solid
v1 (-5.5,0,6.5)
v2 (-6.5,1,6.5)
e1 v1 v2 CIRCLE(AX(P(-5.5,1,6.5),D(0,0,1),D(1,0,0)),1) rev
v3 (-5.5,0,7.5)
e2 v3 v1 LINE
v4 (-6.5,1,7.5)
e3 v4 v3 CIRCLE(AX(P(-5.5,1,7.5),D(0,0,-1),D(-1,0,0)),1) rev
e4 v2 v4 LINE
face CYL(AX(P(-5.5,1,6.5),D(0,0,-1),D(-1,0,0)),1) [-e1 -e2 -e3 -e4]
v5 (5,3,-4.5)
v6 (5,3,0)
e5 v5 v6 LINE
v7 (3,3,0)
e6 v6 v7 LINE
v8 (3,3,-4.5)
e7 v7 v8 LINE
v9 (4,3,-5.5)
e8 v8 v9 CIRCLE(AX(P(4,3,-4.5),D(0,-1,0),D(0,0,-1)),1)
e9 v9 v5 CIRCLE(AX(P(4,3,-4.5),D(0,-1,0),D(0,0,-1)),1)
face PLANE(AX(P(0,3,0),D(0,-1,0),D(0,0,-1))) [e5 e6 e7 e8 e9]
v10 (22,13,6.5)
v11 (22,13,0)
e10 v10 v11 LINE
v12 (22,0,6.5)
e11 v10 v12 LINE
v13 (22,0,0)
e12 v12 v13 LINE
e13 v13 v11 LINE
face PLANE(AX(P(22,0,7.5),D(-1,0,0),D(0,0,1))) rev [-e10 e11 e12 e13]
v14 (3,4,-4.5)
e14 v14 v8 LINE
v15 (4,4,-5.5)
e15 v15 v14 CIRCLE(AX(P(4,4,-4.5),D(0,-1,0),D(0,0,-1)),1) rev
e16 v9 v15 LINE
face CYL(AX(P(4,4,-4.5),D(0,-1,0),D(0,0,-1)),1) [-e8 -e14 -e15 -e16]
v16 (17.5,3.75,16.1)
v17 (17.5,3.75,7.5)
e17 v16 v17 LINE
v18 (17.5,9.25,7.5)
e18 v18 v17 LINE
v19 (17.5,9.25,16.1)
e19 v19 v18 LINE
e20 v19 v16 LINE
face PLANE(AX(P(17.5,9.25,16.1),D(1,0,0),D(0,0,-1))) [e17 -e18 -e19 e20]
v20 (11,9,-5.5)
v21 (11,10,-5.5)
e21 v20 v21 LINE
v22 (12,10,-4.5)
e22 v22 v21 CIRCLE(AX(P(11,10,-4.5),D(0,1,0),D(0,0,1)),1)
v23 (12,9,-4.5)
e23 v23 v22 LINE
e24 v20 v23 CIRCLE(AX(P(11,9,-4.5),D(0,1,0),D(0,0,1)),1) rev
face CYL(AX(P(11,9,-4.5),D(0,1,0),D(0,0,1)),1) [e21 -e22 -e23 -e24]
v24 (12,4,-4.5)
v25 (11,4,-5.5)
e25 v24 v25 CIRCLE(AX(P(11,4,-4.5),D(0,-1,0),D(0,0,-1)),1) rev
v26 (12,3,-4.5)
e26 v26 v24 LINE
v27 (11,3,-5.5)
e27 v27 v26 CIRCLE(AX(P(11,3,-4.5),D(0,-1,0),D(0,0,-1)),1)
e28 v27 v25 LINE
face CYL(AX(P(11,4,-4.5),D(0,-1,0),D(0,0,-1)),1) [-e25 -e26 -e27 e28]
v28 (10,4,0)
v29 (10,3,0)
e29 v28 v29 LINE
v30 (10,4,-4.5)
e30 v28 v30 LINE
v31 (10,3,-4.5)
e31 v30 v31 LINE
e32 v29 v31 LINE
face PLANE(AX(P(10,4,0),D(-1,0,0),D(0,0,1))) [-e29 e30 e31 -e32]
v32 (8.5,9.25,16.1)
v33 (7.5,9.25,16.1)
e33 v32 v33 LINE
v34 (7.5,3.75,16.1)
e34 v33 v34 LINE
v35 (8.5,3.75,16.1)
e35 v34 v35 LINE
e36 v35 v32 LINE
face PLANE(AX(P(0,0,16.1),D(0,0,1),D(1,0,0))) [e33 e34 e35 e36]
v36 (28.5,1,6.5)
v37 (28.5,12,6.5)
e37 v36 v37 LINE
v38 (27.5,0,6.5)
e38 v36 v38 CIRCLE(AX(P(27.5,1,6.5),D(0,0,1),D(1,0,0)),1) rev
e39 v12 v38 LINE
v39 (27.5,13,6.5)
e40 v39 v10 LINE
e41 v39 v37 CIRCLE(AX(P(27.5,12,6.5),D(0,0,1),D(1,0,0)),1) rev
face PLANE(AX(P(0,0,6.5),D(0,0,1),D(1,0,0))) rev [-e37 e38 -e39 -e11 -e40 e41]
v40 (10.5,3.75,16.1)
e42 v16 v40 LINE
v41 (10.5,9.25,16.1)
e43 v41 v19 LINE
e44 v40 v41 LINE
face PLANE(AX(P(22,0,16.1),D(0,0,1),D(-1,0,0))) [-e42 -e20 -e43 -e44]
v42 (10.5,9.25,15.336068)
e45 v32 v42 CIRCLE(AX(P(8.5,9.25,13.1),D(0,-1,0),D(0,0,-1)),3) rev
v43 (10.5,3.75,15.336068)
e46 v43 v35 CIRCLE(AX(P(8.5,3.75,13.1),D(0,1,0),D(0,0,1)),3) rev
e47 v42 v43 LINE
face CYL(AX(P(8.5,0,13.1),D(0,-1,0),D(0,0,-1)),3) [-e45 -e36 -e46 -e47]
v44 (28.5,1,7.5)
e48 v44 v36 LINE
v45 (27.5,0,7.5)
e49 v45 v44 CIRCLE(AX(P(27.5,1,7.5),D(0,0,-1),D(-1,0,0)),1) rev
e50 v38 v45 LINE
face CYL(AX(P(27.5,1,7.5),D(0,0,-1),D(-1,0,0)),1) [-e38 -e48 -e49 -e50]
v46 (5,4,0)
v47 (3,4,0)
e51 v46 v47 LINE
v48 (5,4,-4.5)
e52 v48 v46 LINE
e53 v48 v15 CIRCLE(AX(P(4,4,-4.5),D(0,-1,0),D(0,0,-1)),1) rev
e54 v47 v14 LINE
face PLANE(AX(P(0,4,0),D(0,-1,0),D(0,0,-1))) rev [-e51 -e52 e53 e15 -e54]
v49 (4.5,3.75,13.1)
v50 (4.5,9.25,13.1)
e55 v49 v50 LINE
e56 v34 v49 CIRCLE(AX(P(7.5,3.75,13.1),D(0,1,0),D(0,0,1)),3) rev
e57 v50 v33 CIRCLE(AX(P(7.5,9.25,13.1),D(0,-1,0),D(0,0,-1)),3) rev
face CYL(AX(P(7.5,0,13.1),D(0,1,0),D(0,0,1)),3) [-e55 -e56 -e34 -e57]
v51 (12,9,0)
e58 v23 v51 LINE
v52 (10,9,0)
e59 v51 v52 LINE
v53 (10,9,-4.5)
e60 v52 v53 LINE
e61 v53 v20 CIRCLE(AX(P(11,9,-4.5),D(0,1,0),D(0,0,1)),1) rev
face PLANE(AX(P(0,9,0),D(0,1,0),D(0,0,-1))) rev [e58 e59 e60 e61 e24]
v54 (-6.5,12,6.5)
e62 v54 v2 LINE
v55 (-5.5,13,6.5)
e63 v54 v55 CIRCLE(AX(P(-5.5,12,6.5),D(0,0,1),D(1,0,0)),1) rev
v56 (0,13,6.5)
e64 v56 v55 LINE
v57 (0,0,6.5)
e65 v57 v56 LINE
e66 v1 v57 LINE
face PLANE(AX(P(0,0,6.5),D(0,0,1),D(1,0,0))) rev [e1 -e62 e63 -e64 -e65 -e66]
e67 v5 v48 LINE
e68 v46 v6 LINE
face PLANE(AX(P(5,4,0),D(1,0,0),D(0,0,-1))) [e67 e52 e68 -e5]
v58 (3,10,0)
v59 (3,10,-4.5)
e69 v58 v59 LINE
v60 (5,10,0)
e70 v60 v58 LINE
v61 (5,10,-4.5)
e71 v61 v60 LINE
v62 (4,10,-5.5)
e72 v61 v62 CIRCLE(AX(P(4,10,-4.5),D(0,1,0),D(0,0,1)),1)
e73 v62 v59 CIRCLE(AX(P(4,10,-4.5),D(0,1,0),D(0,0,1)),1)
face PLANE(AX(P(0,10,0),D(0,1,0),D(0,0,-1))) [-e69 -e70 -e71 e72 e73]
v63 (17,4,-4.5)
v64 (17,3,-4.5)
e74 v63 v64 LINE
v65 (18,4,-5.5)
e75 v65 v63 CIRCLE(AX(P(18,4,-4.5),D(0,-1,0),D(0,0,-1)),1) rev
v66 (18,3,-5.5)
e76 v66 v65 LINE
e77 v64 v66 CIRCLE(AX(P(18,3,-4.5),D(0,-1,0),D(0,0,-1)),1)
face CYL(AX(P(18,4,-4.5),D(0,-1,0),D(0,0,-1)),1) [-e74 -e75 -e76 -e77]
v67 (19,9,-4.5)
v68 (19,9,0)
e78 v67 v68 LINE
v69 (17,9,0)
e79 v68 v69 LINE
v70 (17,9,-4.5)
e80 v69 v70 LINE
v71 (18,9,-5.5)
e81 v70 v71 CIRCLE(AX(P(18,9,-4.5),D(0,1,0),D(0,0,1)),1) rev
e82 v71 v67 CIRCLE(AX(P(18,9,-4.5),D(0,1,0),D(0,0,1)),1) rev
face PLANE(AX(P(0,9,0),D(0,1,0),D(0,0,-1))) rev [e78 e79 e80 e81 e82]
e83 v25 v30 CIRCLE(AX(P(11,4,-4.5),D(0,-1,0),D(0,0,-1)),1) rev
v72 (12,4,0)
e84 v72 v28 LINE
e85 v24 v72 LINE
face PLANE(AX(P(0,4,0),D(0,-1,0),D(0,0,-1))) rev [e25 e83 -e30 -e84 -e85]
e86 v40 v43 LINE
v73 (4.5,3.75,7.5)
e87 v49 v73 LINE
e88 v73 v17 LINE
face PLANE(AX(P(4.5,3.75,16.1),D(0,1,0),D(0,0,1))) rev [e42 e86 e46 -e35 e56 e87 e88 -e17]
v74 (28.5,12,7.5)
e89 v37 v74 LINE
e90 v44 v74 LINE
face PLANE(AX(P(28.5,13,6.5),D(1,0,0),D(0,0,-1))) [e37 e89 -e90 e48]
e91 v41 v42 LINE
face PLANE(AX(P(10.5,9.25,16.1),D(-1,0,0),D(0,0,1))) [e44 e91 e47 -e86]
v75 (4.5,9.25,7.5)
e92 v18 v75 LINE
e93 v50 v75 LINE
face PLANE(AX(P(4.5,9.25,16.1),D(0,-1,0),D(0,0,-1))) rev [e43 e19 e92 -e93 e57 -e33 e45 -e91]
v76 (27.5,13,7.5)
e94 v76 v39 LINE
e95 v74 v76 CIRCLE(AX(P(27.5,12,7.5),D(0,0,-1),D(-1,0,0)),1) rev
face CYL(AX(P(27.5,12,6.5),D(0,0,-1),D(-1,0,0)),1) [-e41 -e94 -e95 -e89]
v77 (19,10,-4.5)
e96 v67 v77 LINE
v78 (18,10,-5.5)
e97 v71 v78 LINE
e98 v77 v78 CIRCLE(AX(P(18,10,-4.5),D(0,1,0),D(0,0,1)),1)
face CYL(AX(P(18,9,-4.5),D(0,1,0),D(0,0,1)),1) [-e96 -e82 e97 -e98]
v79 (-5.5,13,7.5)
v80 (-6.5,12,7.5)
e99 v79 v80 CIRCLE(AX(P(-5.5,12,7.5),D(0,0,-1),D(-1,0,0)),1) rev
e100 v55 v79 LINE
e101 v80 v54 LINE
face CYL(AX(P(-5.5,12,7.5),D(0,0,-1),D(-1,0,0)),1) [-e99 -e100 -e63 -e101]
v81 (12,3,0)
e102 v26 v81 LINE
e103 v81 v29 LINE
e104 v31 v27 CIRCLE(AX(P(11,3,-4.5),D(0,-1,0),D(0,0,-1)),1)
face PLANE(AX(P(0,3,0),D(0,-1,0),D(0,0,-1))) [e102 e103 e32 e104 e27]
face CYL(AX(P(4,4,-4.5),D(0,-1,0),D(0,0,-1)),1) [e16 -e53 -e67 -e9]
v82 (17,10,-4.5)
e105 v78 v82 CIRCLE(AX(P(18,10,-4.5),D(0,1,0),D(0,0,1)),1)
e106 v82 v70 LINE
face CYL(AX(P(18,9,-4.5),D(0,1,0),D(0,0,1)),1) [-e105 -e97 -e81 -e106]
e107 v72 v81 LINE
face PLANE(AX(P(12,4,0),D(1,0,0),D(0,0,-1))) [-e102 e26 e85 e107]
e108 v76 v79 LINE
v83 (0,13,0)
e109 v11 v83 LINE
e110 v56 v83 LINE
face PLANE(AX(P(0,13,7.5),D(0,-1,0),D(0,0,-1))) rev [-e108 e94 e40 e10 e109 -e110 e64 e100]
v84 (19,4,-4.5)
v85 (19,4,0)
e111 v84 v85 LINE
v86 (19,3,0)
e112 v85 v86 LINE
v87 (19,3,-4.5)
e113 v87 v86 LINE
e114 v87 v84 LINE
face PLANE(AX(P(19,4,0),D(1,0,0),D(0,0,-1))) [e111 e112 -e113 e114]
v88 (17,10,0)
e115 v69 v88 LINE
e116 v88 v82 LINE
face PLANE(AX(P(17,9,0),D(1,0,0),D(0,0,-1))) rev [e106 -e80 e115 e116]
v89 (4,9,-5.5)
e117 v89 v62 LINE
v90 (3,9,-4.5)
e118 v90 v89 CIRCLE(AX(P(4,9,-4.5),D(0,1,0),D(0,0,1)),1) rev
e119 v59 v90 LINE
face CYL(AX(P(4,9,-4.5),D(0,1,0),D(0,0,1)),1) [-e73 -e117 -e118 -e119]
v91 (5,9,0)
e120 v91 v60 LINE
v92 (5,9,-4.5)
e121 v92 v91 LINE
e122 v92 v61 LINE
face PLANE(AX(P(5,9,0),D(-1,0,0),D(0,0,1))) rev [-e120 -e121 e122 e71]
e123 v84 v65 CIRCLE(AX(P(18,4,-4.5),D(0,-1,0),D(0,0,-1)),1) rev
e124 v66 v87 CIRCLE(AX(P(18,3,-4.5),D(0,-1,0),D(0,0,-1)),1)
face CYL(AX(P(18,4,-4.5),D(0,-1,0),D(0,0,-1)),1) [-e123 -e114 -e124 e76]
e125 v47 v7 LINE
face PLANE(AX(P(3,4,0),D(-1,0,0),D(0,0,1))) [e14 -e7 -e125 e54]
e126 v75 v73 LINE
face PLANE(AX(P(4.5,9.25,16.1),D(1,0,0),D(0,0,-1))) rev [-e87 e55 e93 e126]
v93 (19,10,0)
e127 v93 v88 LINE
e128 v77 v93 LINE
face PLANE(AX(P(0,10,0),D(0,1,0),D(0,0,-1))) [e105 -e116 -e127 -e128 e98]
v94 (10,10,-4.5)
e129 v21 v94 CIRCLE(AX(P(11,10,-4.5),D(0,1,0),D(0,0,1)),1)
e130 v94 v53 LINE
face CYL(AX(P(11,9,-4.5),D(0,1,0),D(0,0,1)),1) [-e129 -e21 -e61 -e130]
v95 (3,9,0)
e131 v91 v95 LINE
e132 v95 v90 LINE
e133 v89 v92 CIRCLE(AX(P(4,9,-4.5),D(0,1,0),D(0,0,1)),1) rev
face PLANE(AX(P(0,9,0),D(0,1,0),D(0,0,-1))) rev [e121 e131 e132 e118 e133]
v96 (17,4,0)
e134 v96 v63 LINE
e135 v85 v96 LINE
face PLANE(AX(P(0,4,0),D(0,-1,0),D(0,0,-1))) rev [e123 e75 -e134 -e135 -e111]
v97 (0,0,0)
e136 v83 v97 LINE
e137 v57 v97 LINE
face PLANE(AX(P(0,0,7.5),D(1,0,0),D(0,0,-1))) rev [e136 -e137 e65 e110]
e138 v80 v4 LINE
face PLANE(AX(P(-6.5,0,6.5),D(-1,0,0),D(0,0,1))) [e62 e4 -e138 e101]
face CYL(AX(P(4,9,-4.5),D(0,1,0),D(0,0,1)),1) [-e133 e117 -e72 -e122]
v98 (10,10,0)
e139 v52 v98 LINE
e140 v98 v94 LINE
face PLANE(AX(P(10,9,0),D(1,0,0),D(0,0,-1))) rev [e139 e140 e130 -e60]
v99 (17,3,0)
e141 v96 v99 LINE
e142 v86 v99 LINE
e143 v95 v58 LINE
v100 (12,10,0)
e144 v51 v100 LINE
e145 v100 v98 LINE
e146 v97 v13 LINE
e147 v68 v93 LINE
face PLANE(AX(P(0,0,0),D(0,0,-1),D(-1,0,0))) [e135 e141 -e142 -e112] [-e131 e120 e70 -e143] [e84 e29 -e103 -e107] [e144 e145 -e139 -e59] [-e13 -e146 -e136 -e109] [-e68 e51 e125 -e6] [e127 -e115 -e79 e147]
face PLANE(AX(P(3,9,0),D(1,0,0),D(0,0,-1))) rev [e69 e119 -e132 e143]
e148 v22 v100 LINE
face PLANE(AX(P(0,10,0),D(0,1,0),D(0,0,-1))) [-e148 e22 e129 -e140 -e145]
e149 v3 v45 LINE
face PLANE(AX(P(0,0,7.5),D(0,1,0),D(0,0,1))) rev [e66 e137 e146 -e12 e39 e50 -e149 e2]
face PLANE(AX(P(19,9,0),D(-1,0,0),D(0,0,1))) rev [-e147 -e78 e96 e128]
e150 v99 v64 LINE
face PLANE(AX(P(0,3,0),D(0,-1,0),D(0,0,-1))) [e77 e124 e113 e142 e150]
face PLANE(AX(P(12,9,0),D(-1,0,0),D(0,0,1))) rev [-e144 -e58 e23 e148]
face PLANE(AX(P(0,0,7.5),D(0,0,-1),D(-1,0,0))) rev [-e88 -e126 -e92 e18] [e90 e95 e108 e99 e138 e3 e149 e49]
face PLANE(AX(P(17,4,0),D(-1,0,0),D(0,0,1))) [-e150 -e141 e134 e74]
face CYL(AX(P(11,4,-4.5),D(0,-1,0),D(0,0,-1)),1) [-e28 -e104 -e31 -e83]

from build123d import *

# Parameters (mm, degrees)
SKETCH_1_W             = 22
SKETCH_1_H             = 13
EXTRUDE_1_DEPTH        = 7.5
SKETCH_2_W             = 6.5
SKETCH_2_H             = 13
EXTRUDE_2_DEPTH        = 1
FILLET_1_R             = 1
SKETCH_3_W             = 2
SKETCH_3_H             = 5.5
EXTRUDE_3_DEPTH        = 0.5
FILLET_2_R             = 1
FILLET_2_OF_MIRROR_1_R = 1
SKETCH_4_W             = 7
SKETCH_4_H             = 5.5
EXTRUDE_4_DEPTH        = 8.6
FILLET_3_R             = 3


with BuildPart() as part:
    # Эскиз1 → Бобышка-Вытянуть1 (new body)
    with BuildSketch(Plane.XY):
        with Locations((11, 6.5)):
            Rectangle(SKETCH_1_W, SKETCH_1_H)
    extrude(amount=EXTRUDE_1_DEPTH)

    # Эскиз2 → Бобышка-Вытянуть2 (add)
    with BuildSketch(Plane.XY.offset(7.5)):
        with Locations((-3.25, 6.5)):
            Rectangle(SKETCH_2_W, SKETCH_2_H)
        with Locations((25.25, 6.5)):
            Rectangle(SKETCH_2_W, SKETCH_2_H)
    extrude(amount=-EXTRUDE_2_DEPTH)

    # Скругление1
    fillet_1_edges = [part.edges().sort_by_distance(p)[0] for p in [
        (28.5, 13, 7),
        (28.5, 0, 7),
        (-6.5, 13, 7),
        (-6.5, 0, 7),
    ]]
    fillet(fillet_1_edges, radius=FILLET_1_R)

    # Эскиз3 → Бобышка-Вытянуть3 (add, symmetric)
    with BuildSketch(Plane(origin=(0, 3.5, 0), x_dir=(-1, 0, 0), z_dir=(0, -1, 0))):
        with Locations((-4, 2.75)):
            Rectangle(SKETCH_3_W, SKETCH_3_H)
        with Locations((-18, 2.75)):
            Rectangle(SKETCH_3_W, SKETCH_3_H)
        with Locations((-11, 2.75)):
            Rectangle(SKETCH_3_W, SKETCH_3_H)
    extrude_3 = extrude(amount=EXTRUDE_3_DEPTH, both=True)

    # Скругление2
    fillet_2_edges = [part.edges().sort_by_distance(p)[0] for p in [
        (19, 3.5, -5.5),
        (17, 3.5, -5.5),
        (12, 3.5, -5.5),
        (10, 3.5, -5.5),
        (5, 3.5, -5.5),
        (3, 3.5, -5.5),
    ]]
    fillet(fillet_2_edges, radius=FILLET_2_R - 0.0001)  # a hair under: the kernel refuses the full size

    # Зеркальное отражение1: Бобышка-Вытянуть3 across plane
    add(extrude_3.mirror(Plane(origin=(0, 6.5, 0), x_dir=(0, 0, 1), z_dir=(0, -1, 0))))

    # Скругление2 of Зеркальное отражение1
    fillet_2_of_mirror_1_edges = [part.edges().sort_by_distance(p)[0] for p in [
        (19, 9.5, -5.5),
        (17, 9.5, -5.5),
        (12, 9.5, -5.5),
        (10, 9.5, -5.5),
        (5, 9.5, -5.5),
        (3, 9.5, -5.5),
    ]]
    fillet(fillet_2_of_mirror_1_edges, radius=FILLET_2_OF_MIRROR_1_R - 0.0001)  # a hair under: the kernel refuses the full size

    # Эскиз4 → Бобышка-Вытянуть4 (add)
    with BuildSketch(Plane.XY.offset(7.5)):
        with Locations((8, 6.5)):
            Rectangle(SKETCH_4_W, SKETCH_4_H)
    extrude_4 = extrude(amount=EXTRUDE_4_DEPTH)

    # Скругление3
    fillet_3_edges = [part.edges().sort_by_distance(p)[0] for p in [
        (11.5, 6.5, 16.1),
        (4.5, 6.5, 16.1),
    ]]
    fillet(fillet_3_edges, radius=FILLET_3_R)

    # Зеркальное отражение4: Бобышка-Вытянуть4 across plane
    add(extrude_4.mirror(Plane(origin=(11, 0, 0), x_dir=(0, 0, 1), z_dir=(1, 0, 0))))


solid = part.part
